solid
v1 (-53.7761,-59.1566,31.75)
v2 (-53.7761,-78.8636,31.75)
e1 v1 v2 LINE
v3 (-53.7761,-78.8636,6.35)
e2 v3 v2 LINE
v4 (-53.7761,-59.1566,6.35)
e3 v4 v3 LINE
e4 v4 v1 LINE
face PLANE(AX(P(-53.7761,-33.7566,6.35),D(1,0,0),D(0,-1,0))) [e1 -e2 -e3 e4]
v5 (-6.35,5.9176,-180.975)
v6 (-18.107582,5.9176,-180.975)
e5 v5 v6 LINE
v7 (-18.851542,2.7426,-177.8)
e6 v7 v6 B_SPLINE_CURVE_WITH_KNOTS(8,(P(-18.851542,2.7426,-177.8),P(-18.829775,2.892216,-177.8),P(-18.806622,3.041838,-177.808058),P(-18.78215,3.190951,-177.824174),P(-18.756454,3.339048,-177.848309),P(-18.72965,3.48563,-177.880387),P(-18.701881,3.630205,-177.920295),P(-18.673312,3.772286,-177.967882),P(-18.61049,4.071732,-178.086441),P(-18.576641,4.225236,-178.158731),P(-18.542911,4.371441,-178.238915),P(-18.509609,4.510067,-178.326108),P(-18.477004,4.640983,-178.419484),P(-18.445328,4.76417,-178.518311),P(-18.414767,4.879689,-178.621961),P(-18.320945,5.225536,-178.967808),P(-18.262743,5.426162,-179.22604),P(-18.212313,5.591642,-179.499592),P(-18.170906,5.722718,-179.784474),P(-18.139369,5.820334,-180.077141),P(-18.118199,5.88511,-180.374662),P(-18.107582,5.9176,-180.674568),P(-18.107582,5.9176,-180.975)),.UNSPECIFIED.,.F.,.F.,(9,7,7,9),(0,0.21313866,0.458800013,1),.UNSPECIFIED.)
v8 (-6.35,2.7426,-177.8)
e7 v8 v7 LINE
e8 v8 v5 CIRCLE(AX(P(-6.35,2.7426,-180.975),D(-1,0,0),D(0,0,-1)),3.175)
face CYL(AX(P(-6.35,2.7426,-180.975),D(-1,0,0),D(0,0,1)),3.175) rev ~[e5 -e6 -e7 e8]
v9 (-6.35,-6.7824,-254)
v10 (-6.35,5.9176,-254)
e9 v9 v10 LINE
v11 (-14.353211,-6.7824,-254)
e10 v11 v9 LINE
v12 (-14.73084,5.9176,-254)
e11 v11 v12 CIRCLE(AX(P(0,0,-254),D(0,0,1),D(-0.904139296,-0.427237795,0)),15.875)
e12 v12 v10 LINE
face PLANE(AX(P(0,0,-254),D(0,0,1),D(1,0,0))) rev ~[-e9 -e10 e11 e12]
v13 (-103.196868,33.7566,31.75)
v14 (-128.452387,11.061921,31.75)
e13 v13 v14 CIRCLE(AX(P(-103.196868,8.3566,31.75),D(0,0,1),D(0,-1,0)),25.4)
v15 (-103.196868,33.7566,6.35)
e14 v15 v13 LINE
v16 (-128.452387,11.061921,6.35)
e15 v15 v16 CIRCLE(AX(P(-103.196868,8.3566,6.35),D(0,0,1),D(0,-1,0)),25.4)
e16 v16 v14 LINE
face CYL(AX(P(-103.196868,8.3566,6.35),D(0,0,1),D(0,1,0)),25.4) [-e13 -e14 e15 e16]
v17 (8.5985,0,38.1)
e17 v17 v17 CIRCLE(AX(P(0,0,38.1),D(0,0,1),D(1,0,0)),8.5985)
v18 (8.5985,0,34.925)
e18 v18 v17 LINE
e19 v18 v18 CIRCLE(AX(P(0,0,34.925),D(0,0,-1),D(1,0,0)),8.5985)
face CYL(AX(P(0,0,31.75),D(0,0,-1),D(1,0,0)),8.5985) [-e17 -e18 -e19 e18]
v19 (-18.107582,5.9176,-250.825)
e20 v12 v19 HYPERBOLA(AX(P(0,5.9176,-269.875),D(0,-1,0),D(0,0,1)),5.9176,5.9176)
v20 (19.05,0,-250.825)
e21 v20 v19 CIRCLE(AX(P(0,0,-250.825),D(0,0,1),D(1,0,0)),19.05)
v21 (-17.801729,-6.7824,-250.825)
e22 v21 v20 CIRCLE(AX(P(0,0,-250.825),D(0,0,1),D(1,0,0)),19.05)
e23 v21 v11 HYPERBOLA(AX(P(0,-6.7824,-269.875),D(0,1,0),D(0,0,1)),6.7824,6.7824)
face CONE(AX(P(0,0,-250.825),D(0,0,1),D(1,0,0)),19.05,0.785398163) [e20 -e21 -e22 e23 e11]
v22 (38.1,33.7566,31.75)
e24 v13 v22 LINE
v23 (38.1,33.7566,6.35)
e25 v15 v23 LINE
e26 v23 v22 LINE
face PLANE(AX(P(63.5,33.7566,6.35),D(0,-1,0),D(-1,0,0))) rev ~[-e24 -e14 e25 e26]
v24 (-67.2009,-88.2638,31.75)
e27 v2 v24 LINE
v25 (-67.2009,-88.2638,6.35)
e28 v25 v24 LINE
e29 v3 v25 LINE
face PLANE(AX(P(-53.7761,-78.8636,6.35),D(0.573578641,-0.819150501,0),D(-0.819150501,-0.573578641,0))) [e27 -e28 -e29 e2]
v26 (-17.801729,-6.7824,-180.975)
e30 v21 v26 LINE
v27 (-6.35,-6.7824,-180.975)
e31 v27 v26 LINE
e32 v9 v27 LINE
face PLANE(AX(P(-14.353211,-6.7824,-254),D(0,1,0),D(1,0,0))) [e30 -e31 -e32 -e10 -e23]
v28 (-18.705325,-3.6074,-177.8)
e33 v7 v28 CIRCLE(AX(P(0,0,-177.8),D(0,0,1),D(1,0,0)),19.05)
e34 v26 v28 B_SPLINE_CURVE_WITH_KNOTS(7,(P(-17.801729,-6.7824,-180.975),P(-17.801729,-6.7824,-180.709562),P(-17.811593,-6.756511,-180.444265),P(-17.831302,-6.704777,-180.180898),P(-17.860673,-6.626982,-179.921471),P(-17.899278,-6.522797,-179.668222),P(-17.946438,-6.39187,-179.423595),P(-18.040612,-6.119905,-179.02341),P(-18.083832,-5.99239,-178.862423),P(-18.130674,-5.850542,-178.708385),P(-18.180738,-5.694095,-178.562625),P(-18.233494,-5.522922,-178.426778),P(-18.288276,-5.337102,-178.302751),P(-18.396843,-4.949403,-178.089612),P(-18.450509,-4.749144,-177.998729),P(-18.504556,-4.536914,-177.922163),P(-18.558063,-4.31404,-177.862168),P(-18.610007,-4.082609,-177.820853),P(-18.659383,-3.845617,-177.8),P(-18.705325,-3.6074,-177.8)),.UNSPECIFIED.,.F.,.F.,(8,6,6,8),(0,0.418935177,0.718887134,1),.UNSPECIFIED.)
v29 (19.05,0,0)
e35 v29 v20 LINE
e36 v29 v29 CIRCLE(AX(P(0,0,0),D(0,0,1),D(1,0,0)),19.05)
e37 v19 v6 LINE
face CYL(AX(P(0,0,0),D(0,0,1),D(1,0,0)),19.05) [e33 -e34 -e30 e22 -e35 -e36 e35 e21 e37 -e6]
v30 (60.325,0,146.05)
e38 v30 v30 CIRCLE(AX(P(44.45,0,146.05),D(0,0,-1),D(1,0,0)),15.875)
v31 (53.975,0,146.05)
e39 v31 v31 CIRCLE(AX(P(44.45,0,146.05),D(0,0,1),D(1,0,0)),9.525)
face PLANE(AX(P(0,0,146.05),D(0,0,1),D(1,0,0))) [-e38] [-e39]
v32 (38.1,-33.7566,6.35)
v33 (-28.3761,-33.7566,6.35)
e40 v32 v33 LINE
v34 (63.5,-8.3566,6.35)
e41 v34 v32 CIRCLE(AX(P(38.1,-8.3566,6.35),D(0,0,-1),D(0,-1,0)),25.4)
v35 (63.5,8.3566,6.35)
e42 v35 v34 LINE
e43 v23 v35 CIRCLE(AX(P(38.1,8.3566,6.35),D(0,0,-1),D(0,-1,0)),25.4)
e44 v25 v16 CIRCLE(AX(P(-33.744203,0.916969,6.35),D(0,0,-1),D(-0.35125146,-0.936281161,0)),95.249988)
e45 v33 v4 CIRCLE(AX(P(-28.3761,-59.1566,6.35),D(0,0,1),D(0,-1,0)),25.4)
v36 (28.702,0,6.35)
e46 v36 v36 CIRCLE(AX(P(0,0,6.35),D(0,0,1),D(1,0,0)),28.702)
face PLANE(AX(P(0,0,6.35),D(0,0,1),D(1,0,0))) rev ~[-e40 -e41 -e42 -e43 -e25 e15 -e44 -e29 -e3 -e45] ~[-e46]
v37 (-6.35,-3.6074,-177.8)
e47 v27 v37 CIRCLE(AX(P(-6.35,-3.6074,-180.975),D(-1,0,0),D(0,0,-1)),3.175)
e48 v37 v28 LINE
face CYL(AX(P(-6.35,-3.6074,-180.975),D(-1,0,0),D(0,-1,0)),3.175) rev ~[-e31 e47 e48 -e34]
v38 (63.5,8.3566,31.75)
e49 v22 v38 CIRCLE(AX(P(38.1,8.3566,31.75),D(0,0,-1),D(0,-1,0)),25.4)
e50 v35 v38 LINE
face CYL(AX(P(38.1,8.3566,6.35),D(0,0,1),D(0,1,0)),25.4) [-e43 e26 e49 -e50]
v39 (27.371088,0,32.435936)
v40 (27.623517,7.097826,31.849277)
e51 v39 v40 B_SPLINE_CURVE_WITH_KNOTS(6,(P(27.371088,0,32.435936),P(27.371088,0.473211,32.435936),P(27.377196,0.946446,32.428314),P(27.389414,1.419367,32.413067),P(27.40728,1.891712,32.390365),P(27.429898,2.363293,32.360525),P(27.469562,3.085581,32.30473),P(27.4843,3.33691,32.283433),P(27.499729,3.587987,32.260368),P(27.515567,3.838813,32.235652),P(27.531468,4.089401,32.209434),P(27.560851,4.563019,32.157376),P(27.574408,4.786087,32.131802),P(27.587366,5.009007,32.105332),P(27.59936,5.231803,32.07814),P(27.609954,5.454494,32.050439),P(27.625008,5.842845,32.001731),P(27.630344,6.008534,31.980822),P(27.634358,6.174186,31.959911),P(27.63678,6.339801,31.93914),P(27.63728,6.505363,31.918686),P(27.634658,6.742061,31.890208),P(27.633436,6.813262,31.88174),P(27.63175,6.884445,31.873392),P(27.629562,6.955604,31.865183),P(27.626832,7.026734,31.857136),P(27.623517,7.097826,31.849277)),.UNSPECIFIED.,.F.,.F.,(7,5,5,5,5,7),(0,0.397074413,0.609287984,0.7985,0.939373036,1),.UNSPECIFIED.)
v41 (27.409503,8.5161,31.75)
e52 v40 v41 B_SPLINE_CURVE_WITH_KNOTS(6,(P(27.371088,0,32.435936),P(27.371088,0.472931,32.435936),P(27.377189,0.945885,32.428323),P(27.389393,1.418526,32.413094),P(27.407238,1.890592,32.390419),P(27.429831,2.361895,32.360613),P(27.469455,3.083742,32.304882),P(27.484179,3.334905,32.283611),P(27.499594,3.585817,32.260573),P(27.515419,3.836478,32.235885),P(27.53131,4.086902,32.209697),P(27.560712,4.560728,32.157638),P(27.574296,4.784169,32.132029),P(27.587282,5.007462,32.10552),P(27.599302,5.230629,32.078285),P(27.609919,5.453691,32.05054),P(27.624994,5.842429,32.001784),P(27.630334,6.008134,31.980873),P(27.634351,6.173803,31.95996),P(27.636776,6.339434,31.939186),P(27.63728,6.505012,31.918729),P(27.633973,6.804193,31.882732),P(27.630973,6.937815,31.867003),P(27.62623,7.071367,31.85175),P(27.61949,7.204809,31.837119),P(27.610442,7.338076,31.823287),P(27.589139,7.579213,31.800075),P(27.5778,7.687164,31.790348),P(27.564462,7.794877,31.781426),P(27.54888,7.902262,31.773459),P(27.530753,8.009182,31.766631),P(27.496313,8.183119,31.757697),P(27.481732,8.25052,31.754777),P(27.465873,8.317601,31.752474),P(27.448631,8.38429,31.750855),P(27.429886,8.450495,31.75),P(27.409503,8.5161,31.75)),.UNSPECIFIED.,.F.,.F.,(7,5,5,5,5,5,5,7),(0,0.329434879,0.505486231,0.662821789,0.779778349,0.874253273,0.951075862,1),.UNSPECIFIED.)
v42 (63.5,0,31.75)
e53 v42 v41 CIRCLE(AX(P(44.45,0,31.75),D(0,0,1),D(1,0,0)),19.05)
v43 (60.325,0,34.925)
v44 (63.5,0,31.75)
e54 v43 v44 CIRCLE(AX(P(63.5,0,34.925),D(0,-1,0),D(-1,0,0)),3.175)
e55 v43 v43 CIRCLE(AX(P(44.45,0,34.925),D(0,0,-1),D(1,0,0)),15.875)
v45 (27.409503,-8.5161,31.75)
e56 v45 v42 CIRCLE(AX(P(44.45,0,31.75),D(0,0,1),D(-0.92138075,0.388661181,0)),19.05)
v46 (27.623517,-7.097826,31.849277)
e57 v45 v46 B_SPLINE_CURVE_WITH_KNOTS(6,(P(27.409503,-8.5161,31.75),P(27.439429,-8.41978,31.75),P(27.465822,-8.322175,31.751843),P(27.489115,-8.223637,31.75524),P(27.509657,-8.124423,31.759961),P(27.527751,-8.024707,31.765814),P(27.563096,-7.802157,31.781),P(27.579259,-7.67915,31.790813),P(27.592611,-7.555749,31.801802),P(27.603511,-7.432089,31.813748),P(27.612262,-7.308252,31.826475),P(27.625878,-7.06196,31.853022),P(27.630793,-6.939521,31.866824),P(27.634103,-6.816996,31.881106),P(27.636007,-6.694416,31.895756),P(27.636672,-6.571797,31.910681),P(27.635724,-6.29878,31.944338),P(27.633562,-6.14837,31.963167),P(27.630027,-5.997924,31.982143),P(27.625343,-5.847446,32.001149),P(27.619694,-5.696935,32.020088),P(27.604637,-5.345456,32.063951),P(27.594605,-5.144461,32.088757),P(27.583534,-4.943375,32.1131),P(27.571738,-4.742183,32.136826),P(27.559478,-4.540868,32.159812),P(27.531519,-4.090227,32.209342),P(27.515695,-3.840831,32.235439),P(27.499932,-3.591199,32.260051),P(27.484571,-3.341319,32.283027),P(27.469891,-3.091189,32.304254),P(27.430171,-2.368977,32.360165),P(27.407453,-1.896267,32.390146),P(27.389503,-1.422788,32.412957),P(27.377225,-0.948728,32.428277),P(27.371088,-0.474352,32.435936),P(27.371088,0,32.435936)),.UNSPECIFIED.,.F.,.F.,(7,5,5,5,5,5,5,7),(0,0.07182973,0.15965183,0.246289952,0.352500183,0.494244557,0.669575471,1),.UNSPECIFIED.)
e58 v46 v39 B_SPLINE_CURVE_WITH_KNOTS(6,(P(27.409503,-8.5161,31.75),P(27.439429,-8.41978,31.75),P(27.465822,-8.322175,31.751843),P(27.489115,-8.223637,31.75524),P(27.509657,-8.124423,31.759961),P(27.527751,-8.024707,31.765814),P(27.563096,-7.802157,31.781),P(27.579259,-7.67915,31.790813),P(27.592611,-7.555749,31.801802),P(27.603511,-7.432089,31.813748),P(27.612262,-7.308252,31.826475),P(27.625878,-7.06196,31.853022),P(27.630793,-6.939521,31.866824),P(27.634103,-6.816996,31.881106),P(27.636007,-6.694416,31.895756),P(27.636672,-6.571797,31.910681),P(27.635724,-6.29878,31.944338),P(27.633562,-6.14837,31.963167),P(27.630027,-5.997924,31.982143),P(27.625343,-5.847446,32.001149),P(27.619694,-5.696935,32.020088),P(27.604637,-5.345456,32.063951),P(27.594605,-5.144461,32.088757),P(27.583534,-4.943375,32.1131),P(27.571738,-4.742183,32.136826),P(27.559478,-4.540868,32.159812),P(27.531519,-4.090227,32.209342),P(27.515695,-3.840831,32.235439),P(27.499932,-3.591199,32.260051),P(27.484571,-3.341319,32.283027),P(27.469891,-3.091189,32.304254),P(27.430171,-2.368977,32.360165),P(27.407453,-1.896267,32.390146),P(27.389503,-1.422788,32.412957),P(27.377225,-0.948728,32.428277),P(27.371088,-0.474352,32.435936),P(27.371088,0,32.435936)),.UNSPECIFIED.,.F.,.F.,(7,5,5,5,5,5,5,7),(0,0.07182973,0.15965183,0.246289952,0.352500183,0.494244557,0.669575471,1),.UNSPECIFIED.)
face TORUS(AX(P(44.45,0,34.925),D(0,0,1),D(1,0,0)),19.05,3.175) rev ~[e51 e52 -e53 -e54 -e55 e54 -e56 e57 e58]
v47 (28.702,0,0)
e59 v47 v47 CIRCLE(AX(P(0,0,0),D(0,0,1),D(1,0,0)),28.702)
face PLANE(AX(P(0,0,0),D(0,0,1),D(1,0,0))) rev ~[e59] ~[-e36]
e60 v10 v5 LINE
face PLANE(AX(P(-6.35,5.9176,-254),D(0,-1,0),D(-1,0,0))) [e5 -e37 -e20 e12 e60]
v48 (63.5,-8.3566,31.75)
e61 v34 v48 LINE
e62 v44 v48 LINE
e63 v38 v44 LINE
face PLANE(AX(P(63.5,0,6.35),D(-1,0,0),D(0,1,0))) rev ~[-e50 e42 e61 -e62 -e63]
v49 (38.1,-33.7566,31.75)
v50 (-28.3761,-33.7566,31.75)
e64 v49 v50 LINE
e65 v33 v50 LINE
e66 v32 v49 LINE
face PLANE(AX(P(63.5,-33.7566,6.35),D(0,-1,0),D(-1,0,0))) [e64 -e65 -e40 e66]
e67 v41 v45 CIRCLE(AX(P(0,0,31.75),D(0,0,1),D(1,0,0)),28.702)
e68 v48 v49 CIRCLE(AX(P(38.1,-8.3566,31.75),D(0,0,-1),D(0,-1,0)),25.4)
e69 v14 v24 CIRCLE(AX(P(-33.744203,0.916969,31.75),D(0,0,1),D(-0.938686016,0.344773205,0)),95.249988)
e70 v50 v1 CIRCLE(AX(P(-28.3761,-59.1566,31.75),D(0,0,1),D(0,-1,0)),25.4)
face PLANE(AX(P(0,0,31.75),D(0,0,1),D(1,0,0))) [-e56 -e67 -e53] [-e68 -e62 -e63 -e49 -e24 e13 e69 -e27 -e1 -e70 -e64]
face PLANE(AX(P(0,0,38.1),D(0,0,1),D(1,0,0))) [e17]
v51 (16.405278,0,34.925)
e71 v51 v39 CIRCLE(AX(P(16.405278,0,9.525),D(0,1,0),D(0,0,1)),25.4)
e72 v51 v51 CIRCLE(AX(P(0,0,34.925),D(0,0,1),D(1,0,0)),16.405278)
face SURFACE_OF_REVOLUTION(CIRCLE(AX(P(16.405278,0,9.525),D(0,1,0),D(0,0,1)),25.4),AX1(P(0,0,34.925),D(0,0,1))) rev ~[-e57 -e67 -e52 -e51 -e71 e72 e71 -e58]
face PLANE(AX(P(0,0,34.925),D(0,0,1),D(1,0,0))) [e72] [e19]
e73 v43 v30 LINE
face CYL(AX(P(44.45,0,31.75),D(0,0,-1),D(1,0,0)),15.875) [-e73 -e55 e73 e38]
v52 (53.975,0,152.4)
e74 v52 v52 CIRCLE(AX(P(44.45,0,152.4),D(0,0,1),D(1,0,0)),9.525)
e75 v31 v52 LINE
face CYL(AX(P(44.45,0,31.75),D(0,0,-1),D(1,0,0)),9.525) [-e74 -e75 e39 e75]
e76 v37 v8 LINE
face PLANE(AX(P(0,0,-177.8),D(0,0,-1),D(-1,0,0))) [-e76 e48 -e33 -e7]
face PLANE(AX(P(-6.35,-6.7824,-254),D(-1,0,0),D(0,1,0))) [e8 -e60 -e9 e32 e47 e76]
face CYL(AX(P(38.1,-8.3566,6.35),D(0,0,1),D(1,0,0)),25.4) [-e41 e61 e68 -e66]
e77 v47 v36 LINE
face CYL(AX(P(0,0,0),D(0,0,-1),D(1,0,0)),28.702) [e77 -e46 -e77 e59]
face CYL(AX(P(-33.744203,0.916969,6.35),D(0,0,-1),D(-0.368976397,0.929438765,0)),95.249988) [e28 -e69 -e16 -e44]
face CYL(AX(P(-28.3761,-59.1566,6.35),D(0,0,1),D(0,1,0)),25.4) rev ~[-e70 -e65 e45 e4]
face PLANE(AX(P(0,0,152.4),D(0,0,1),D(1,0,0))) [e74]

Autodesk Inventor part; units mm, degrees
ref_plane "YZ Plane" through (0, 0, 0) normal (1, 0, 0) x (0, 1, 0)
ref_plane "XZ Plane" through (0, 0, 0) normal (0, 1, 0) x (-1, 0, 0)
ref_plane "XY Plane" through (0, 0, 0) normal (0, 0, 1) x (1, 0, 0)
sketch "Sketch1" plane through (0, 0, 0) normal (0, 0, 1) x (1, 0, 0)
  circle A0 centre (0, 0) radius 19.05
  circle A1 centre (0, 0) radius 28.702
  dimension "d1" = 9.652
  dimension "d38" = 38.1
extrude "Extrusion1" add sketch "Sketch1" against normal blind 254 contours A0
extrude "Extrusion2" add sketch "Sketch1" along normal blind 6.35 contours A0 | A1
chamfer "Chamfer1" distance 3.175 angle 45 1 edges at (-19.05, 0, -254)
sketch "Sketch2" plane through (0, 0, 6.35) normal (0, 0, 1) x (1, 0, 0)
  circle A0 centre (0, 0) radius 28.702 projected
  circle A1 centre (0, 0) radius 33.7566
  arc A2 (-68.8892, 89.446) -> (-67.2009, -88.2638) centre (-33.7441, 0.9169) ccw
  line L0 (-53.7761, -78.8636) -> (-67.2009, -88.2638)
  line L1 (0, -33.7566) -> (0, 33.7566)
  line L2 (-53.7761, 78.8636) -> (-53.7761, -78.8636)
  line L3 (-53.7761, 78.8636) -> (-68.8892, 89.446)
  line L4 (63.5, 33.7566) -> (-53.7761, 33.7566)
  line L5 (0, 0) -> (-53.7761, 0)
  line L6 (-146.05, 0) -> (-154.4505, 0)
  line L7 (63.5, -33.7566) -> (-53.7761, -33.7566)
  line L8 (0, 0) -> (63.5, 0)
  line L9 (63.5, 0) -> (63.5, -33.7566)
  line L10 (63.5, 0) -> (63.5, 33.7566)
  line L11 (-53.7761, 33.7566) -> (-123.154, 33.7566)
  line L12 (-53.7761, 0) -> (-128.9897, 0)
  line L13 (-53.7761, -33.7566) -> (-122.4589, -33.7566)
  dimension "d8" = 125
  dimension "d10" = 190.5
  dimension "d17" = 63.5
extrude "Extrusion10" add sketch "Sketch2" along normal blind 25.4 contours L8 L1 A0 | L8 A1 L1 A0 | A0 L1 L8 | A0 L1 A1 L8 | L1 L5 A0 | A0 L5 A1 L1 | L1 A1 L5 A0 | A0 L5 L1 | L8 L9 L7 A1 | A1 L4 L10 L8 | A1 L5 L2 L4 | L7 L2 L5 A1 | L2 L12 A2 L11 | L13 A2 L12 L2 | L2 L0 A2 L13
fillet "Fillet1" radius 25.4 4 edges at (-53.7761, -33.7566, 19.05) (63.5, -33.7566, 19.05) (63.5, 33.7566, 19.05) (-123.154, 33.7566, 19.05)
sketch "Sketch3" plane through (0, 0, 31.75) normal (0, 0, 1) x (1, 0, 0)
  circle A0 centre (0, 0) radius 28.702
  circle A1 centre (0, 0) radius 8.5985
  arc A2 (-103.1968, 33.7566) -> (-128.4523, 11.0619) centre (-103.1968, 8.3566) ccw projected
  arc A3 (-128.4523, 11.0619) -> (-67.2009, -88.2638) centre (-33.7441, 0.9169) ccw projected
  line L0 (-53.7761, -78.8636) -> (-67.2009, -88.2638) projected
  line L1 (-53.7761, -59.1566) -> (-53.7761, -78.8636) projected
  arc A4 (-28.3761, -33.7566) -> (-53.7761, -59.1566) centre (-28.3761, -59.1566) ccw projected
  line L2 (38.1, -33.7566) -> (-28.3761, -33.7566) projected
  arc A5 (38.1, -33.7566) -> (63.5, -8.3566) centre (38.1, -8.3566) ccw projected
  line L3 (63.5, 8.3566) -> (63.5, -8.3566) projected
  arc A6 (63.5, 8.3566) -> (38.1, 33.7566) centre (38.1, 8.3566) ccw projected
  line L4 (-103.1968, 33.7566) -> (38.1, 33.7566) projected
extrude "Extrusion5" add sketch "Sketch3" along normal blind 3.175 contours A0 | A1
extrude "Extrusion6" add sketch "Sketch3" along normal blind 6.35 contours A1
fillet "Fillet2" radius 25.4 1 edges at (-28.702, 0, 34.925)
sketch "Sketch4" plane through (0, 0, 31.75) normal (0, 0, 1) x (1, 0, 0)
  line L0 (63.5, 8.3566) -> (63.5, -8.3566)
  circle A0 centre (44.45, 0) radius 15.875
  circle A1 centre (44.45, 0) radius 9.525
  arc A2 (-28.702, 0) -> (28.702, 0) centre (0, 0) ccw projected
  arc A3 (28.702, 0) -> (-28.702, 0) centre (0, 0) ccw projected
  arc A4 (-103.1968, 33.7566) -> (-128.4523, 11.0619) centre (-103.1968, 8.3566) ccw projected
  arc A5 (-128.4523, 11.0619) -> (-67.2009, -88.2638) centre (-33.7441, 0.9169) ccw projected
  line L1 (-53.7761, -78.8636) -> (-67.2009, -88.2638) projected
  line L2 (-53.7761, -59.1566) -> (-53.7761, -78.8636) projected
  arc A6 (-28.3761, -33.7566) -> (-53.7761, -59.1566) centre (-28.3761, -59.1566) ccw projected
  line L3 (38.1, -33.7566) -> (-28.3761, -33.7566) projected
  arc A7 (38.1, -33.7566) -> (63.5, -8.3566) centre (38.1, -8.3566) ccw projected
  line L4 (63.5, 8.3566) -> (63.5, -8.3566) projected
  arc A8 (63.5, 8.3566) -> (38.1, 33.7566) centre (38.1, 8.3566) ccw projected
  line L5 (-103.1968, 33.7566) -> (38.1, 33.7566) projected
  dimension "d24" = 19.05
  dimension "d25" = 31.75
  dimension "d26" = 19.05
extrude "Extrusion7" add sketch "Sketch4" along normal blind 120.65 contours A1
extrude "Extrusion8" add sketch "Sketch4" along normal blind 114.3 contours A0 A2 A3 | A3 A2 A0 picked at (58.0643, -1.2262) picked at (28.6234, 0)
fillet "Fillet3" radius 3.175 2 edges at (45.2559, 15.8545, 31.75) (45.2559, -15.8545, 31.75)
sketch "Sketch5" plane through (0, 0, -254) normal (0, 0, -1) x (-1, 0, 0)
  circle A0 centre (0, 0) radius 15.875 projected
  line L0 (6.35, 5.9176) -> (31.75, 5.9176)
  line L1 (31.75, 5.9176) -> (31.75, -6.7824)
  line L2 (31.75, -6.7824) -> (6.35, -6.7824)
  line L3 (6.35, -6.7824) -> (6.35, 5.9176)
  dimension "d32" = 12.7
  dimension "d33" = 25.4
  dimension "d34" = 6.35
extrude "Extrusion9" cut sketch "Sketch5" against normal blind 76.2 contours A0 L2 L3 L0 | A0 L0 L1 L2 picked at (9.525, -0.2883)
fillet "Fillet4" radius 3.175 2 edges at (-12.0759, -6.7824, -177.8) (-12.2288, 5.9176, -177.8)
equation "\"d9\" = d8"
equation "\"d12\" = d11"
equation "\"d11\" = 31.75"
properties part number "Crankshaft" material "Steel, High Strength Low Alloy"
